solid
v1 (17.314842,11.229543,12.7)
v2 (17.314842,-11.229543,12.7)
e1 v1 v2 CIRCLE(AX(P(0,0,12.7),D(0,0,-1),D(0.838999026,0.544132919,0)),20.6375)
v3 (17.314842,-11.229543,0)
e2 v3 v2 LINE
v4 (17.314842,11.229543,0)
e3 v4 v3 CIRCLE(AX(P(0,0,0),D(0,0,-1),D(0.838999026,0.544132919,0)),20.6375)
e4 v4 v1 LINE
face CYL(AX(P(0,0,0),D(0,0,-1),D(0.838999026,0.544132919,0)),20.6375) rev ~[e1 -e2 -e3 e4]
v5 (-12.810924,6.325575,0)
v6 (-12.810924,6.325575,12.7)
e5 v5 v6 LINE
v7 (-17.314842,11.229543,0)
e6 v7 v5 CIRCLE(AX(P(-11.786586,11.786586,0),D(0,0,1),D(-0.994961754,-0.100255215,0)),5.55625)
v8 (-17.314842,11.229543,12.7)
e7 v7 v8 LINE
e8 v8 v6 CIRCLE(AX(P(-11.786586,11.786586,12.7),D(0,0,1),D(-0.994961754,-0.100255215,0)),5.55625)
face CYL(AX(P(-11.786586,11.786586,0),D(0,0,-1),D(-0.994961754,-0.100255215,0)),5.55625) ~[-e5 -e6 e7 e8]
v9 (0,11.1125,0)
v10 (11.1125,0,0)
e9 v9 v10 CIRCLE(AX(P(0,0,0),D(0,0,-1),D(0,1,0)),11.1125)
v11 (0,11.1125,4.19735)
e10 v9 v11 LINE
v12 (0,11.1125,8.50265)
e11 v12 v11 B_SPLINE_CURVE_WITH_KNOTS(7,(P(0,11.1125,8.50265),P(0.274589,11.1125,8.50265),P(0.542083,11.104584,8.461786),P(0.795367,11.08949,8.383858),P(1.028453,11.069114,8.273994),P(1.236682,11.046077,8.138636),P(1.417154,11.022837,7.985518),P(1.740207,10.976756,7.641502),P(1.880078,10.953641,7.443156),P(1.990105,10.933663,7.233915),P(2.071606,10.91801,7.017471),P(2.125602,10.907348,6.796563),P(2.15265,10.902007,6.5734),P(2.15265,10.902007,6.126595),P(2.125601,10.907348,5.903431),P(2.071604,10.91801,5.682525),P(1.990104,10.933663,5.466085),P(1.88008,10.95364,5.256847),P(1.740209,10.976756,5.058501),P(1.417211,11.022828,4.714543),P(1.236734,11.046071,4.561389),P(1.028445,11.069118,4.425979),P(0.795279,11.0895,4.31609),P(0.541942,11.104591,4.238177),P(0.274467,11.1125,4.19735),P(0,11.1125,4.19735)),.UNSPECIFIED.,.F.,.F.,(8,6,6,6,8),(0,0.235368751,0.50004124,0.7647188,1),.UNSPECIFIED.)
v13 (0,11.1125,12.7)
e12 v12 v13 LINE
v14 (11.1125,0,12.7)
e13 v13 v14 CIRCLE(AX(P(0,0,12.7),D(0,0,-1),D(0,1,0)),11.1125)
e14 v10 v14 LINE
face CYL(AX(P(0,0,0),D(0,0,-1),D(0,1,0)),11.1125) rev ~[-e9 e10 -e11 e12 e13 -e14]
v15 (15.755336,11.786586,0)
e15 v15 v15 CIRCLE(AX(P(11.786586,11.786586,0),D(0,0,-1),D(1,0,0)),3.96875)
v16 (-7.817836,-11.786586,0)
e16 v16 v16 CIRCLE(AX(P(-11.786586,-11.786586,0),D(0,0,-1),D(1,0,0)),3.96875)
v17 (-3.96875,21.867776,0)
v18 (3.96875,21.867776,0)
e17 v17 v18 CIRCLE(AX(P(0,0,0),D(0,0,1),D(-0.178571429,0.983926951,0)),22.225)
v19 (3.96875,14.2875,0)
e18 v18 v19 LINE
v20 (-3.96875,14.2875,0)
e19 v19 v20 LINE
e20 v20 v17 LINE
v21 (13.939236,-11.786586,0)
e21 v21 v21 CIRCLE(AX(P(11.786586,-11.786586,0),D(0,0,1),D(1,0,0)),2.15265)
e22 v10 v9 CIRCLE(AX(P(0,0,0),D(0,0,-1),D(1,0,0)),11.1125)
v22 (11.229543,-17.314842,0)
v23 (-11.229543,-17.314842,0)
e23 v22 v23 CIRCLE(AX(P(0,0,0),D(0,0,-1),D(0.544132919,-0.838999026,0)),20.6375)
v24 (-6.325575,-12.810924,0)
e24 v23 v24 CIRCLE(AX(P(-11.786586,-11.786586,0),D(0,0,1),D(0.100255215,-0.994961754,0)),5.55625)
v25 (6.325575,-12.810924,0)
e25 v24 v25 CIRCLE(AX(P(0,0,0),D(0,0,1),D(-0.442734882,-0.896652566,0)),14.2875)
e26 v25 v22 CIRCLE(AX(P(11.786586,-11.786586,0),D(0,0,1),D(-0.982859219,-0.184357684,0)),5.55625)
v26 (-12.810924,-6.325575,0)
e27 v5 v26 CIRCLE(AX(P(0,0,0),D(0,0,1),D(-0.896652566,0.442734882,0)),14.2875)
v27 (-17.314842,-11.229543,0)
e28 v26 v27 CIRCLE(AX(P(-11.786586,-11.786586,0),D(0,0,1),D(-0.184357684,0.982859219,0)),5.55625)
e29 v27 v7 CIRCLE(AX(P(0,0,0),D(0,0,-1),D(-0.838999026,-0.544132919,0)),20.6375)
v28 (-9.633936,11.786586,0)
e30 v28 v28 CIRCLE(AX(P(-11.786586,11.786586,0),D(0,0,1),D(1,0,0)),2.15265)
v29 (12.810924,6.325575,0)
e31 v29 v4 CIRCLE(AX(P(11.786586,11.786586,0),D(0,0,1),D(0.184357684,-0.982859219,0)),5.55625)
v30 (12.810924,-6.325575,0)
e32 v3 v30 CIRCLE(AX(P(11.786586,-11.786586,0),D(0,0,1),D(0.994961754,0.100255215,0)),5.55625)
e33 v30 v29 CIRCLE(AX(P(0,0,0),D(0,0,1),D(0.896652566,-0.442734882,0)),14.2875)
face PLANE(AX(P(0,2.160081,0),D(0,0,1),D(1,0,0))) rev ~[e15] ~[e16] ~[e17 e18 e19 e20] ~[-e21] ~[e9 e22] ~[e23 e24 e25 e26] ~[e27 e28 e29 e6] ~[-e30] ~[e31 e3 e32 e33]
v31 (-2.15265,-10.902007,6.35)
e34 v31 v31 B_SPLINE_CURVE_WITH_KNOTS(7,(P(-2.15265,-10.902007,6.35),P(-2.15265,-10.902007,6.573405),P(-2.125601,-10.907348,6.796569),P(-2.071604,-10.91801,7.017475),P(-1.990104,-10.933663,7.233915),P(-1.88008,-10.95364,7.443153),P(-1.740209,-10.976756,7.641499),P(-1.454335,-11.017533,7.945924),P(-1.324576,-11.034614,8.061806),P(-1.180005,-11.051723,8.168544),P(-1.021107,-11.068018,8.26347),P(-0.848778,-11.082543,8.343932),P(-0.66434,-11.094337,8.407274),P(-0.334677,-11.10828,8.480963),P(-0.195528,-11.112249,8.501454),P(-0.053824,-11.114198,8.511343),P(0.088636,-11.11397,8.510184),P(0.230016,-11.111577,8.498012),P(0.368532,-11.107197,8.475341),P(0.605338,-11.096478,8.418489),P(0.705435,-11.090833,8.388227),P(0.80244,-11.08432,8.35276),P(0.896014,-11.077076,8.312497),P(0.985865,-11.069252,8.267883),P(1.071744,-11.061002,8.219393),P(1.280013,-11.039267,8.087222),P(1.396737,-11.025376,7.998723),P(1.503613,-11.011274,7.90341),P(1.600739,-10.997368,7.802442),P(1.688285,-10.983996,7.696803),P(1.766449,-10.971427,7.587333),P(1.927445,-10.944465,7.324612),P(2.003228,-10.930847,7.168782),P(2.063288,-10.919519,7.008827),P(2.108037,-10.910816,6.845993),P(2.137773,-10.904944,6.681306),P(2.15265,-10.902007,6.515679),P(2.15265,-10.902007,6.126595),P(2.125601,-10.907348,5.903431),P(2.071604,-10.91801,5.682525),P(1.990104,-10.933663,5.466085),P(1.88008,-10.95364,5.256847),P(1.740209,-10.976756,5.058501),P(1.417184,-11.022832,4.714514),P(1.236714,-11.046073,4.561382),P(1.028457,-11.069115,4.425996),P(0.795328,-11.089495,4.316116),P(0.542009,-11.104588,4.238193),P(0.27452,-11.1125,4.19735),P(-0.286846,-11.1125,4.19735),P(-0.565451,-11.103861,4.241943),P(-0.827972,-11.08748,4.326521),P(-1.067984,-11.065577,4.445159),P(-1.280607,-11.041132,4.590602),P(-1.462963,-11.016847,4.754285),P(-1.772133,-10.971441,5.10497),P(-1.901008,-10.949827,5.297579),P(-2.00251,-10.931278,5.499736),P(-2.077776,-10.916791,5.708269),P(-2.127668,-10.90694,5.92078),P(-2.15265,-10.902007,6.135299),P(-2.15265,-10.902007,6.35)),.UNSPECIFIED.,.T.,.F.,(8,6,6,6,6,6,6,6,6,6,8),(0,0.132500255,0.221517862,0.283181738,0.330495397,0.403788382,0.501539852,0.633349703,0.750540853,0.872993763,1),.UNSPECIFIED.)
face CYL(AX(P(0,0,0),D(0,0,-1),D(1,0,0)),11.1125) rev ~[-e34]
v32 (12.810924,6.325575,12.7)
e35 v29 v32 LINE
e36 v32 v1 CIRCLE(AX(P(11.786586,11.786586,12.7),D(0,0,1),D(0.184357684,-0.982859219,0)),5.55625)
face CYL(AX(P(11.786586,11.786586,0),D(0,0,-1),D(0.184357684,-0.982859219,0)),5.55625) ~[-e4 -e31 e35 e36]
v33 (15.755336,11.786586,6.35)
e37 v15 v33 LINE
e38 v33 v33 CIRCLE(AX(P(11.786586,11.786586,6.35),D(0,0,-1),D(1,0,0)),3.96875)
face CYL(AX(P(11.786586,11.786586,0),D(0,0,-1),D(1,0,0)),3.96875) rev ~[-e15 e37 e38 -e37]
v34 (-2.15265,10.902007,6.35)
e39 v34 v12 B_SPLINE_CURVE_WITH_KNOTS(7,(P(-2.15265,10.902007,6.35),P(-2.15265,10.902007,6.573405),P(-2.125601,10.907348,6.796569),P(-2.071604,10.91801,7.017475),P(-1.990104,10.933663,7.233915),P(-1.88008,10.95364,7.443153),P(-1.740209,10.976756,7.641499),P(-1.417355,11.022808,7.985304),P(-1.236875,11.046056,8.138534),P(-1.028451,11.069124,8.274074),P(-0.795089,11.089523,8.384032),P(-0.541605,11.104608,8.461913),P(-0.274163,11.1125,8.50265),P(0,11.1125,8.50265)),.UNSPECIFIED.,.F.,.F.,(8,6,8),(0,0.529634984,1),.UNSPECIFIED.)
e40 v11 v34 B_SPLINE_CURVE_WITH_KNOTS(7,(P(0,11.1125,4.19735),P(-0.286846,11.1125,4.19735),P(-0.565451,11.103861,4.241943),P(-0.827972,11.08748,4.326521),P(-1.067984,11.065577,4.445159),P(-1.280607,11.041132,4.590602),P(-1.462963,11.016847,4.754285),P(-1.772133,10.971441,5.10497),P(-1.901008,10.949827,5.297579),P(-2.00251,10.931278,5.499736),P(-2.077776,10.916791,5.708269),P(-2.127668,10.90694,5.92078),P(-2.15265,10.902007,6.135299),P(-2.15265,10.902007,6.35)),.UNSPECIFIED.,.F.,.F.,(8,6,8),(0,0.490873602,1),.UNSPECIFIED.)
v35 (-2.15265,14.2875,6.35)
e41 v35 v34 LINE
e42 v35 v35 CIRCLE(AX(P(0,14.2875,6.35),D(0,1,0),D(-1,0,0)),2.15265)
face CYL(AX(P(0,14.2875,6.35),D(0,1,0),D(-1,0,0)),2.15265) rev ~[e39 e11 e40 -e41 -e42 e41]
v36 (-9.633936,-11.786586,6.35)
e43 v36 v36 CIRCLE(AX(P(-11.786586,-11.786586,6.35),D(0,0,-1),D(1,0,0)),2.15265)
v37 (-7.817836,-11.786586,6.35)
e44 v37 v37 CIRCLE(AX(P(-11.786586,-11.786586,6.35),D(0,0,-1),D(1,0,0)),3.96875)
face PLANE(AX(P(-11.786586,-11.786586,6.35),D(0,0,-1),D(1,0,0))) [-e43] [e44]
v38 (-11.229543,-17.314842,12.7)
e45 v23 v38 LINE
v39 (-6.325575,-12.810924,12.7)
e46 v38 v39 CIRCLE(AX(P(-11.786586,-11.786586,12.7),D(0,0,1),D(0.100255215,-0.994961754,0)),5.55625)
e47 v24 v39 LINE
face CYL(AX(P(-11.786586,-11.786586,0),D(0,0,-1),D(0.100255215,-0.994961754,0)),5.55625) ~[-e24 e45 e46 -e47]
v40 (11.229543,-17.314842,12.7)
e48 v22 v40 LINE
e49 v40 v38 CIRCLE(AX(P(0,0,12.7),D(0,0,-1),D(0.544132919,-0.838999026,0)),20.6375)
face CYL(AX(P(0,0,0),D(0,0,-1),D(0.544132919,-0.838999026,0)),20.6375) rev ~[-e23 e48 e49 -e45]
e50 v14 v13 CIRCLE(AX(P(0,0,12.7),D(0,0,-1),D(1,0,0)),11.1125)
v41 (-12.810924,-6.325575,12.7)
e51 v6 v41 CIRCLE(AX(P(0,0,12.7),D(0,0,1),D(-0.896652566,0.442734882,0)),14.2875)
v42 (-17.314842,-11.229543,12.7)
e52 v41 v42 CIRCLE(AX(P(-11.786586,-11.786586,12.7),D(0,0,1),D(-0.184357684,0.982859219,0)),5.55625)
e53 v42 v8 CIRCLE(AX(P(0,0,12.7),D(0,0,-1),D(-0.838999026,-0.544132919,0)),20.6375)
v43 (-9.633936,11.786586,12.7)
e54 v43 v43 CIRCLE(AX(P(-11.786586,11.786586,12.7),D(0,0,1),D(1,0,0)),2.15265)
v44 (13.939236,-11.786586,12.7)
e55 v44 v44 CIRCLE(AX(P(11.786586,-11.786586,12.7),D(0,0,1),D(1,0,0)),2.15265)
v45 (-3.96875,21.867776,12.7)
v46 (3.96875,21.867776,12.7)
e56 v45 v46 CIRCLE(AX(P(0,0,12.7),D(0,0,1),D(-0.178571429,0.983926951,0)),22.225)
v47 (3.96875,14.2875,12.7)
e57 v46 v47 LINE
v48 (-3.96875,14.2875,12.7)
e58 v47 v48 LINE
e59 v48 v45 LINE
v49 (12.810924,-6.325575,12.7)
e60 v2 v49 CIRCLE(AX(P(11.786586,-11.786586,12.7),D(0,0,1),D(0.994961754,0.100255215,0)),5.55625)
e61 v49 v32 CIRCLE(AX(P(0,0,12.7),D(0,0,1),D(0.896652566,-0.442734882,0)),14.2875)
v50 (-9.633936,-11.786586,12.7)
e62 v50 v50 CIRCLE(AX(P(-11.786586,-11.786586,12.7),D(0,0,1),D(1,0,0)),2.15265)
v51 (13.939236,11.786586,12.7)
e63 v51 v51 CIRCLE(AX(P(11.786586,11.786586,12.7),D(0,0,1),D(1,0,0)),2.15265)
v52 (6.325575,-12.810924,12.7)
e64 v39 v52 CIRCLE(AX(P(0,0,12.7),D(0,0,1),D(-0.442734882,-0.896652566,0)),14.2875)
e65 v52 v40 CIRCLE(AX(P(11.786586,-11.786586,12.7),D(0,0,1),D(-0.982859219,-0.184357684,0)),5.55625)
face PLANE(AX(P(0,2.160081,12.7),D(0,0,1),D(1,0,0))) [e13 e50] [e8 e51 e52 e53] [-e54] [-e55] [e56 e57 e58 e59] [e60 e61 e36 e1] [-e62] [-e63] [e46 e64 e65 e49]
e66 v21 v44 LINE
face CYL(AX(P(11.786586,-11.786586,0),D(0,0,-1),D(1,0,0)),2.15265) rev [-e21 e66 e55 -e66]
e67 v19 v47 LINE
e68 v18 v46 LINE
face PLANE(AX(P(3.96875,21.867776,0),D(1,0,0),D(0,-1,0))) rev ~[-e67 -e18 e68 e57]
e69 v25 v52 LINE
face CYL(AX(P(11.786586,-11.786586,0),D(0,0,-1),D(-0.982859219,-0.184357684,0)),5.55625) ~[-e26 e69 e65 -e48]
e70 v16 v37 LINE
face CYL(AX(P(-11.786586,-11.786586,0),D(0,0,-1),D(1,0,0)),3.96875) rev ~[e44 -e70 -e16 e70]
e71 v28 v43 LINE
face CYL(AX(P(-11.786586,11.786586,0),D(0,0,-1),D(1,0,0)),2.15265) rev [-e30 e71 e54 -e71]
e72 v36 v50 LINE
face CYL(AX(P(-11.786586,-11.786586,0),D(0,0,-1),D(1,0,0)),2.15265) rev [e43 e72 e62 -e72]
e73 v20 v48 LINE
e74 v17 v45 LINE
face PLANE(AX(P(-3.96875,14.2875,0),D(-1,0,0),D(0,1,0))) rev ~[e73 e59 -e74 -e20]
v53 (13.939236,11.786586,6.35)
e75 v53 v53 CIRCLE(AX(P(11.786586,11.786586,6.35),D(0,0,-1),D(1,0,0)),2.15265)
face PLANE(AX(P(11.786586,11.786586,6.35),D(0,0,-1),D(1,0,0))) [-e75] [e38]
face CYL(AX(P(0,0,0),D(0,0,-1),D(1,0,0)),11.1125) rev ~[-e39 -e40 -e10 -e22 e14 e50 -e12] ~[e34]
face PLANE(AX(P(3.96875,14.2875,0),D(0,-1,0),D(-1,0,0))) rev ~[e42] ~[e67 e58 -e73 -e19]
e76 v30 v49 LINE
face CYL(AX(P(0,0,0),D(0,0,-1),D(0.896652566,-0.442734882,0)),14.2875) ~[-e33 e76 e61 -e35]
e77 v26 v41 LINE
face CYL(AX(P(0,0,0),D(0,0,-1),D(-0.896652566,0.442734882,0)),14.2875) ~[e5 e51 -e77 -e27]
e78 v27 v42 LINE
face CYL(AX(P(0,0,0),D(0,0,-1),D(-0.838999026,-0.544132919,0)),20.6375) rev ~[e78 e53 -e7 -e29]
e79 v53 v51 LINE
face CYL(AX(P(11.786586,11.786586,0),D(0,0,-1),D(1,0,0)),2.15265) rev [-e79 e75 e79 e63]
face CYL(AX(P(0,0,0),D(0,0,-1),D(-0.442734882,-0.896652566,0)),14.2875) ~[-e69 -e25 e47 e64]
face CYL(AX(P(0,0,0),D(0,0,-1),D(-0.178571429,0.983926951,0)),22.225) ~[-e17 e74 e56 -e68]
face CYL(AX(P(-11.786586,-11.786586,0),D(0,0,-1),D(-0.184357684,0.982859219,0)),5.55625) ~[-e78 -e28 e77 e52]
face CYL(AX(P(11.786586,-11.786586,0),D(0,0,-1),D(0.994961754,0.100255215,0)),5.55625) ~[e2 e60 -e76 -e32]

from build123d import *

# Parameters (mm, degrees)
F0_R            = 2.15265
F1_DEPTH        = 12.7
F2_R            = 2.15265
F3_REACH        = 42.6021136501
F5_R            = 3.96875
F6_DEPTH        = 6.35
F8_DEPTH        = 12.7
F8_COPIES_COUNT = 3
F8_COPIES_ANGLE = 180


# Not quite as in the source:
# - a pattern or mirror of a feature is missing from the dataset's text; its kind, count and spacing are read off the source's solid


with BuildPart() as f1:
    # F0 (on Top) → F1 (new body)
    with BuildSketch(Plane.XY):
        with BuildLine():
            Line((3.96875, 14.2875), (0, 14.2875))
            Line((0, 14.2875), (-3.96875, 14.2875))
            Line((-3.96875, 14.2875), (-3.96875, 21.8677764859))
            ThreePointArc((-3.96875, 21.8677764859), (0, -22.225), (3.96875, 21.8677764859))
            Line((3.96875, 21.8677764859), (3.96875, 14.2875))
        make_face()
        with Locations((-11.7865861589, -11.7865861589)):
            Circle(F0_R, mode=Mode.SUBTRACT)
        with Locations((11.7865861589, -11.7865861589)):
            Circle(F0_R, mode=Mode.SUBTRACT)
        with Locations((-11.7865861589, 11.7865861589)):
            Circle(F0_R, mode=Mode.SUBTRACT)
        with BuildLine():
            ThreePointArc((0, 11.1125), (7.8577241059, 7.8577241059), (11.1125, 0))
            ThreePointArc((11.1125, 0), (-7.8577241059, -7.8577241059), (0, 11.1125))
        make_face(mode=Mode.SUBTRACT)
        with Locations((11.7865861589, 11.7865861589)):
            Circle(F0_R, mode=Mode.SUBTRACT)
    extrude(amount=F1_DEPTH)

    f3_end = f1.faces().sort_by_distance((0, -11.1125, 6.35))[0]
    # F2 (on face) → F3 (cut, up to a face of the model that its end follows)
    with BuildSketch(Plane(origin=(0, 14.2875, 0), x_dir=(-1, 0, 0), z_dir=(0, 1, 0))):
        with Locations((0, 6.35)):
            Circle(F2_R)
    f3_long = extrude(amount=-F3_REACH, mode=Mode.PRIVATE)
    add(split(f3_long, bisect_by=f3_end, keep=Keep.ALL, mode=Mode.PRIVATE).solids().sort_by_distance((0, 14.2875, 6.35))[0], mode=Mode.SUBTRACT)

    # F5 (on face) → F6 (cut, through all)
    with BuildSketch(Plane(origin=(0, 0, 0), x_dir=(1, 0, 0), z_dir=(0, 0, -1))):
        with Locations((11.7865861589, -11.7865861589)):
            Circle(F5_R)
        with Locations((-11.7865861589, 11.7865861589)):
            Circle(F5_R)
    extrude(amount=-F6_DEPTH, mode=Mode.SUBTRACT)

    # F7 (on face) → F8 (cut, through all)
    with BuildSketch(Plane(origin=(0, 0, 0), x_dir=(1, 0, 0), z_dir=(0, 0, -1))):
        with BuildLine():
            ThreePointArc((-17.3148424047, -11.229543123), (-15.8788163052, -8.0281867), (-12.8109235396, -6.3255746232))
            ThreePointArc((-12.8109235396, -6.3255746232), (-14.2875, 0), (-12.8109235396, 6.3255746232))
            ThreePointArc((-12.8109235396, 6.3255746232), (-15.8788163052, 8.0281867), (-17.3148424047, 11.229543123))
            ThreePointArc((-17.3148424047, 11.229543123), (-20.6375, 0), (-17.3148424047, -11.229543123))
        make_face()
    f8 = extrude(amount=-F8_DEPTH, mode=Mode.SUBTRACT)

    # F8_copies: F8 ×3 about axis
    f8_copies_axis = Axis((0, 0, 0), (0, 0, 1))
    for i in range(1, F8_COPIES_COUNT):
        add(f8.rotate(f8_copies_axis, i * F8_COPIES_ANGLE / (F8_COPIES_COUNT - 1)), mode=Mode.SUBTRACT)


solid = f1.part
